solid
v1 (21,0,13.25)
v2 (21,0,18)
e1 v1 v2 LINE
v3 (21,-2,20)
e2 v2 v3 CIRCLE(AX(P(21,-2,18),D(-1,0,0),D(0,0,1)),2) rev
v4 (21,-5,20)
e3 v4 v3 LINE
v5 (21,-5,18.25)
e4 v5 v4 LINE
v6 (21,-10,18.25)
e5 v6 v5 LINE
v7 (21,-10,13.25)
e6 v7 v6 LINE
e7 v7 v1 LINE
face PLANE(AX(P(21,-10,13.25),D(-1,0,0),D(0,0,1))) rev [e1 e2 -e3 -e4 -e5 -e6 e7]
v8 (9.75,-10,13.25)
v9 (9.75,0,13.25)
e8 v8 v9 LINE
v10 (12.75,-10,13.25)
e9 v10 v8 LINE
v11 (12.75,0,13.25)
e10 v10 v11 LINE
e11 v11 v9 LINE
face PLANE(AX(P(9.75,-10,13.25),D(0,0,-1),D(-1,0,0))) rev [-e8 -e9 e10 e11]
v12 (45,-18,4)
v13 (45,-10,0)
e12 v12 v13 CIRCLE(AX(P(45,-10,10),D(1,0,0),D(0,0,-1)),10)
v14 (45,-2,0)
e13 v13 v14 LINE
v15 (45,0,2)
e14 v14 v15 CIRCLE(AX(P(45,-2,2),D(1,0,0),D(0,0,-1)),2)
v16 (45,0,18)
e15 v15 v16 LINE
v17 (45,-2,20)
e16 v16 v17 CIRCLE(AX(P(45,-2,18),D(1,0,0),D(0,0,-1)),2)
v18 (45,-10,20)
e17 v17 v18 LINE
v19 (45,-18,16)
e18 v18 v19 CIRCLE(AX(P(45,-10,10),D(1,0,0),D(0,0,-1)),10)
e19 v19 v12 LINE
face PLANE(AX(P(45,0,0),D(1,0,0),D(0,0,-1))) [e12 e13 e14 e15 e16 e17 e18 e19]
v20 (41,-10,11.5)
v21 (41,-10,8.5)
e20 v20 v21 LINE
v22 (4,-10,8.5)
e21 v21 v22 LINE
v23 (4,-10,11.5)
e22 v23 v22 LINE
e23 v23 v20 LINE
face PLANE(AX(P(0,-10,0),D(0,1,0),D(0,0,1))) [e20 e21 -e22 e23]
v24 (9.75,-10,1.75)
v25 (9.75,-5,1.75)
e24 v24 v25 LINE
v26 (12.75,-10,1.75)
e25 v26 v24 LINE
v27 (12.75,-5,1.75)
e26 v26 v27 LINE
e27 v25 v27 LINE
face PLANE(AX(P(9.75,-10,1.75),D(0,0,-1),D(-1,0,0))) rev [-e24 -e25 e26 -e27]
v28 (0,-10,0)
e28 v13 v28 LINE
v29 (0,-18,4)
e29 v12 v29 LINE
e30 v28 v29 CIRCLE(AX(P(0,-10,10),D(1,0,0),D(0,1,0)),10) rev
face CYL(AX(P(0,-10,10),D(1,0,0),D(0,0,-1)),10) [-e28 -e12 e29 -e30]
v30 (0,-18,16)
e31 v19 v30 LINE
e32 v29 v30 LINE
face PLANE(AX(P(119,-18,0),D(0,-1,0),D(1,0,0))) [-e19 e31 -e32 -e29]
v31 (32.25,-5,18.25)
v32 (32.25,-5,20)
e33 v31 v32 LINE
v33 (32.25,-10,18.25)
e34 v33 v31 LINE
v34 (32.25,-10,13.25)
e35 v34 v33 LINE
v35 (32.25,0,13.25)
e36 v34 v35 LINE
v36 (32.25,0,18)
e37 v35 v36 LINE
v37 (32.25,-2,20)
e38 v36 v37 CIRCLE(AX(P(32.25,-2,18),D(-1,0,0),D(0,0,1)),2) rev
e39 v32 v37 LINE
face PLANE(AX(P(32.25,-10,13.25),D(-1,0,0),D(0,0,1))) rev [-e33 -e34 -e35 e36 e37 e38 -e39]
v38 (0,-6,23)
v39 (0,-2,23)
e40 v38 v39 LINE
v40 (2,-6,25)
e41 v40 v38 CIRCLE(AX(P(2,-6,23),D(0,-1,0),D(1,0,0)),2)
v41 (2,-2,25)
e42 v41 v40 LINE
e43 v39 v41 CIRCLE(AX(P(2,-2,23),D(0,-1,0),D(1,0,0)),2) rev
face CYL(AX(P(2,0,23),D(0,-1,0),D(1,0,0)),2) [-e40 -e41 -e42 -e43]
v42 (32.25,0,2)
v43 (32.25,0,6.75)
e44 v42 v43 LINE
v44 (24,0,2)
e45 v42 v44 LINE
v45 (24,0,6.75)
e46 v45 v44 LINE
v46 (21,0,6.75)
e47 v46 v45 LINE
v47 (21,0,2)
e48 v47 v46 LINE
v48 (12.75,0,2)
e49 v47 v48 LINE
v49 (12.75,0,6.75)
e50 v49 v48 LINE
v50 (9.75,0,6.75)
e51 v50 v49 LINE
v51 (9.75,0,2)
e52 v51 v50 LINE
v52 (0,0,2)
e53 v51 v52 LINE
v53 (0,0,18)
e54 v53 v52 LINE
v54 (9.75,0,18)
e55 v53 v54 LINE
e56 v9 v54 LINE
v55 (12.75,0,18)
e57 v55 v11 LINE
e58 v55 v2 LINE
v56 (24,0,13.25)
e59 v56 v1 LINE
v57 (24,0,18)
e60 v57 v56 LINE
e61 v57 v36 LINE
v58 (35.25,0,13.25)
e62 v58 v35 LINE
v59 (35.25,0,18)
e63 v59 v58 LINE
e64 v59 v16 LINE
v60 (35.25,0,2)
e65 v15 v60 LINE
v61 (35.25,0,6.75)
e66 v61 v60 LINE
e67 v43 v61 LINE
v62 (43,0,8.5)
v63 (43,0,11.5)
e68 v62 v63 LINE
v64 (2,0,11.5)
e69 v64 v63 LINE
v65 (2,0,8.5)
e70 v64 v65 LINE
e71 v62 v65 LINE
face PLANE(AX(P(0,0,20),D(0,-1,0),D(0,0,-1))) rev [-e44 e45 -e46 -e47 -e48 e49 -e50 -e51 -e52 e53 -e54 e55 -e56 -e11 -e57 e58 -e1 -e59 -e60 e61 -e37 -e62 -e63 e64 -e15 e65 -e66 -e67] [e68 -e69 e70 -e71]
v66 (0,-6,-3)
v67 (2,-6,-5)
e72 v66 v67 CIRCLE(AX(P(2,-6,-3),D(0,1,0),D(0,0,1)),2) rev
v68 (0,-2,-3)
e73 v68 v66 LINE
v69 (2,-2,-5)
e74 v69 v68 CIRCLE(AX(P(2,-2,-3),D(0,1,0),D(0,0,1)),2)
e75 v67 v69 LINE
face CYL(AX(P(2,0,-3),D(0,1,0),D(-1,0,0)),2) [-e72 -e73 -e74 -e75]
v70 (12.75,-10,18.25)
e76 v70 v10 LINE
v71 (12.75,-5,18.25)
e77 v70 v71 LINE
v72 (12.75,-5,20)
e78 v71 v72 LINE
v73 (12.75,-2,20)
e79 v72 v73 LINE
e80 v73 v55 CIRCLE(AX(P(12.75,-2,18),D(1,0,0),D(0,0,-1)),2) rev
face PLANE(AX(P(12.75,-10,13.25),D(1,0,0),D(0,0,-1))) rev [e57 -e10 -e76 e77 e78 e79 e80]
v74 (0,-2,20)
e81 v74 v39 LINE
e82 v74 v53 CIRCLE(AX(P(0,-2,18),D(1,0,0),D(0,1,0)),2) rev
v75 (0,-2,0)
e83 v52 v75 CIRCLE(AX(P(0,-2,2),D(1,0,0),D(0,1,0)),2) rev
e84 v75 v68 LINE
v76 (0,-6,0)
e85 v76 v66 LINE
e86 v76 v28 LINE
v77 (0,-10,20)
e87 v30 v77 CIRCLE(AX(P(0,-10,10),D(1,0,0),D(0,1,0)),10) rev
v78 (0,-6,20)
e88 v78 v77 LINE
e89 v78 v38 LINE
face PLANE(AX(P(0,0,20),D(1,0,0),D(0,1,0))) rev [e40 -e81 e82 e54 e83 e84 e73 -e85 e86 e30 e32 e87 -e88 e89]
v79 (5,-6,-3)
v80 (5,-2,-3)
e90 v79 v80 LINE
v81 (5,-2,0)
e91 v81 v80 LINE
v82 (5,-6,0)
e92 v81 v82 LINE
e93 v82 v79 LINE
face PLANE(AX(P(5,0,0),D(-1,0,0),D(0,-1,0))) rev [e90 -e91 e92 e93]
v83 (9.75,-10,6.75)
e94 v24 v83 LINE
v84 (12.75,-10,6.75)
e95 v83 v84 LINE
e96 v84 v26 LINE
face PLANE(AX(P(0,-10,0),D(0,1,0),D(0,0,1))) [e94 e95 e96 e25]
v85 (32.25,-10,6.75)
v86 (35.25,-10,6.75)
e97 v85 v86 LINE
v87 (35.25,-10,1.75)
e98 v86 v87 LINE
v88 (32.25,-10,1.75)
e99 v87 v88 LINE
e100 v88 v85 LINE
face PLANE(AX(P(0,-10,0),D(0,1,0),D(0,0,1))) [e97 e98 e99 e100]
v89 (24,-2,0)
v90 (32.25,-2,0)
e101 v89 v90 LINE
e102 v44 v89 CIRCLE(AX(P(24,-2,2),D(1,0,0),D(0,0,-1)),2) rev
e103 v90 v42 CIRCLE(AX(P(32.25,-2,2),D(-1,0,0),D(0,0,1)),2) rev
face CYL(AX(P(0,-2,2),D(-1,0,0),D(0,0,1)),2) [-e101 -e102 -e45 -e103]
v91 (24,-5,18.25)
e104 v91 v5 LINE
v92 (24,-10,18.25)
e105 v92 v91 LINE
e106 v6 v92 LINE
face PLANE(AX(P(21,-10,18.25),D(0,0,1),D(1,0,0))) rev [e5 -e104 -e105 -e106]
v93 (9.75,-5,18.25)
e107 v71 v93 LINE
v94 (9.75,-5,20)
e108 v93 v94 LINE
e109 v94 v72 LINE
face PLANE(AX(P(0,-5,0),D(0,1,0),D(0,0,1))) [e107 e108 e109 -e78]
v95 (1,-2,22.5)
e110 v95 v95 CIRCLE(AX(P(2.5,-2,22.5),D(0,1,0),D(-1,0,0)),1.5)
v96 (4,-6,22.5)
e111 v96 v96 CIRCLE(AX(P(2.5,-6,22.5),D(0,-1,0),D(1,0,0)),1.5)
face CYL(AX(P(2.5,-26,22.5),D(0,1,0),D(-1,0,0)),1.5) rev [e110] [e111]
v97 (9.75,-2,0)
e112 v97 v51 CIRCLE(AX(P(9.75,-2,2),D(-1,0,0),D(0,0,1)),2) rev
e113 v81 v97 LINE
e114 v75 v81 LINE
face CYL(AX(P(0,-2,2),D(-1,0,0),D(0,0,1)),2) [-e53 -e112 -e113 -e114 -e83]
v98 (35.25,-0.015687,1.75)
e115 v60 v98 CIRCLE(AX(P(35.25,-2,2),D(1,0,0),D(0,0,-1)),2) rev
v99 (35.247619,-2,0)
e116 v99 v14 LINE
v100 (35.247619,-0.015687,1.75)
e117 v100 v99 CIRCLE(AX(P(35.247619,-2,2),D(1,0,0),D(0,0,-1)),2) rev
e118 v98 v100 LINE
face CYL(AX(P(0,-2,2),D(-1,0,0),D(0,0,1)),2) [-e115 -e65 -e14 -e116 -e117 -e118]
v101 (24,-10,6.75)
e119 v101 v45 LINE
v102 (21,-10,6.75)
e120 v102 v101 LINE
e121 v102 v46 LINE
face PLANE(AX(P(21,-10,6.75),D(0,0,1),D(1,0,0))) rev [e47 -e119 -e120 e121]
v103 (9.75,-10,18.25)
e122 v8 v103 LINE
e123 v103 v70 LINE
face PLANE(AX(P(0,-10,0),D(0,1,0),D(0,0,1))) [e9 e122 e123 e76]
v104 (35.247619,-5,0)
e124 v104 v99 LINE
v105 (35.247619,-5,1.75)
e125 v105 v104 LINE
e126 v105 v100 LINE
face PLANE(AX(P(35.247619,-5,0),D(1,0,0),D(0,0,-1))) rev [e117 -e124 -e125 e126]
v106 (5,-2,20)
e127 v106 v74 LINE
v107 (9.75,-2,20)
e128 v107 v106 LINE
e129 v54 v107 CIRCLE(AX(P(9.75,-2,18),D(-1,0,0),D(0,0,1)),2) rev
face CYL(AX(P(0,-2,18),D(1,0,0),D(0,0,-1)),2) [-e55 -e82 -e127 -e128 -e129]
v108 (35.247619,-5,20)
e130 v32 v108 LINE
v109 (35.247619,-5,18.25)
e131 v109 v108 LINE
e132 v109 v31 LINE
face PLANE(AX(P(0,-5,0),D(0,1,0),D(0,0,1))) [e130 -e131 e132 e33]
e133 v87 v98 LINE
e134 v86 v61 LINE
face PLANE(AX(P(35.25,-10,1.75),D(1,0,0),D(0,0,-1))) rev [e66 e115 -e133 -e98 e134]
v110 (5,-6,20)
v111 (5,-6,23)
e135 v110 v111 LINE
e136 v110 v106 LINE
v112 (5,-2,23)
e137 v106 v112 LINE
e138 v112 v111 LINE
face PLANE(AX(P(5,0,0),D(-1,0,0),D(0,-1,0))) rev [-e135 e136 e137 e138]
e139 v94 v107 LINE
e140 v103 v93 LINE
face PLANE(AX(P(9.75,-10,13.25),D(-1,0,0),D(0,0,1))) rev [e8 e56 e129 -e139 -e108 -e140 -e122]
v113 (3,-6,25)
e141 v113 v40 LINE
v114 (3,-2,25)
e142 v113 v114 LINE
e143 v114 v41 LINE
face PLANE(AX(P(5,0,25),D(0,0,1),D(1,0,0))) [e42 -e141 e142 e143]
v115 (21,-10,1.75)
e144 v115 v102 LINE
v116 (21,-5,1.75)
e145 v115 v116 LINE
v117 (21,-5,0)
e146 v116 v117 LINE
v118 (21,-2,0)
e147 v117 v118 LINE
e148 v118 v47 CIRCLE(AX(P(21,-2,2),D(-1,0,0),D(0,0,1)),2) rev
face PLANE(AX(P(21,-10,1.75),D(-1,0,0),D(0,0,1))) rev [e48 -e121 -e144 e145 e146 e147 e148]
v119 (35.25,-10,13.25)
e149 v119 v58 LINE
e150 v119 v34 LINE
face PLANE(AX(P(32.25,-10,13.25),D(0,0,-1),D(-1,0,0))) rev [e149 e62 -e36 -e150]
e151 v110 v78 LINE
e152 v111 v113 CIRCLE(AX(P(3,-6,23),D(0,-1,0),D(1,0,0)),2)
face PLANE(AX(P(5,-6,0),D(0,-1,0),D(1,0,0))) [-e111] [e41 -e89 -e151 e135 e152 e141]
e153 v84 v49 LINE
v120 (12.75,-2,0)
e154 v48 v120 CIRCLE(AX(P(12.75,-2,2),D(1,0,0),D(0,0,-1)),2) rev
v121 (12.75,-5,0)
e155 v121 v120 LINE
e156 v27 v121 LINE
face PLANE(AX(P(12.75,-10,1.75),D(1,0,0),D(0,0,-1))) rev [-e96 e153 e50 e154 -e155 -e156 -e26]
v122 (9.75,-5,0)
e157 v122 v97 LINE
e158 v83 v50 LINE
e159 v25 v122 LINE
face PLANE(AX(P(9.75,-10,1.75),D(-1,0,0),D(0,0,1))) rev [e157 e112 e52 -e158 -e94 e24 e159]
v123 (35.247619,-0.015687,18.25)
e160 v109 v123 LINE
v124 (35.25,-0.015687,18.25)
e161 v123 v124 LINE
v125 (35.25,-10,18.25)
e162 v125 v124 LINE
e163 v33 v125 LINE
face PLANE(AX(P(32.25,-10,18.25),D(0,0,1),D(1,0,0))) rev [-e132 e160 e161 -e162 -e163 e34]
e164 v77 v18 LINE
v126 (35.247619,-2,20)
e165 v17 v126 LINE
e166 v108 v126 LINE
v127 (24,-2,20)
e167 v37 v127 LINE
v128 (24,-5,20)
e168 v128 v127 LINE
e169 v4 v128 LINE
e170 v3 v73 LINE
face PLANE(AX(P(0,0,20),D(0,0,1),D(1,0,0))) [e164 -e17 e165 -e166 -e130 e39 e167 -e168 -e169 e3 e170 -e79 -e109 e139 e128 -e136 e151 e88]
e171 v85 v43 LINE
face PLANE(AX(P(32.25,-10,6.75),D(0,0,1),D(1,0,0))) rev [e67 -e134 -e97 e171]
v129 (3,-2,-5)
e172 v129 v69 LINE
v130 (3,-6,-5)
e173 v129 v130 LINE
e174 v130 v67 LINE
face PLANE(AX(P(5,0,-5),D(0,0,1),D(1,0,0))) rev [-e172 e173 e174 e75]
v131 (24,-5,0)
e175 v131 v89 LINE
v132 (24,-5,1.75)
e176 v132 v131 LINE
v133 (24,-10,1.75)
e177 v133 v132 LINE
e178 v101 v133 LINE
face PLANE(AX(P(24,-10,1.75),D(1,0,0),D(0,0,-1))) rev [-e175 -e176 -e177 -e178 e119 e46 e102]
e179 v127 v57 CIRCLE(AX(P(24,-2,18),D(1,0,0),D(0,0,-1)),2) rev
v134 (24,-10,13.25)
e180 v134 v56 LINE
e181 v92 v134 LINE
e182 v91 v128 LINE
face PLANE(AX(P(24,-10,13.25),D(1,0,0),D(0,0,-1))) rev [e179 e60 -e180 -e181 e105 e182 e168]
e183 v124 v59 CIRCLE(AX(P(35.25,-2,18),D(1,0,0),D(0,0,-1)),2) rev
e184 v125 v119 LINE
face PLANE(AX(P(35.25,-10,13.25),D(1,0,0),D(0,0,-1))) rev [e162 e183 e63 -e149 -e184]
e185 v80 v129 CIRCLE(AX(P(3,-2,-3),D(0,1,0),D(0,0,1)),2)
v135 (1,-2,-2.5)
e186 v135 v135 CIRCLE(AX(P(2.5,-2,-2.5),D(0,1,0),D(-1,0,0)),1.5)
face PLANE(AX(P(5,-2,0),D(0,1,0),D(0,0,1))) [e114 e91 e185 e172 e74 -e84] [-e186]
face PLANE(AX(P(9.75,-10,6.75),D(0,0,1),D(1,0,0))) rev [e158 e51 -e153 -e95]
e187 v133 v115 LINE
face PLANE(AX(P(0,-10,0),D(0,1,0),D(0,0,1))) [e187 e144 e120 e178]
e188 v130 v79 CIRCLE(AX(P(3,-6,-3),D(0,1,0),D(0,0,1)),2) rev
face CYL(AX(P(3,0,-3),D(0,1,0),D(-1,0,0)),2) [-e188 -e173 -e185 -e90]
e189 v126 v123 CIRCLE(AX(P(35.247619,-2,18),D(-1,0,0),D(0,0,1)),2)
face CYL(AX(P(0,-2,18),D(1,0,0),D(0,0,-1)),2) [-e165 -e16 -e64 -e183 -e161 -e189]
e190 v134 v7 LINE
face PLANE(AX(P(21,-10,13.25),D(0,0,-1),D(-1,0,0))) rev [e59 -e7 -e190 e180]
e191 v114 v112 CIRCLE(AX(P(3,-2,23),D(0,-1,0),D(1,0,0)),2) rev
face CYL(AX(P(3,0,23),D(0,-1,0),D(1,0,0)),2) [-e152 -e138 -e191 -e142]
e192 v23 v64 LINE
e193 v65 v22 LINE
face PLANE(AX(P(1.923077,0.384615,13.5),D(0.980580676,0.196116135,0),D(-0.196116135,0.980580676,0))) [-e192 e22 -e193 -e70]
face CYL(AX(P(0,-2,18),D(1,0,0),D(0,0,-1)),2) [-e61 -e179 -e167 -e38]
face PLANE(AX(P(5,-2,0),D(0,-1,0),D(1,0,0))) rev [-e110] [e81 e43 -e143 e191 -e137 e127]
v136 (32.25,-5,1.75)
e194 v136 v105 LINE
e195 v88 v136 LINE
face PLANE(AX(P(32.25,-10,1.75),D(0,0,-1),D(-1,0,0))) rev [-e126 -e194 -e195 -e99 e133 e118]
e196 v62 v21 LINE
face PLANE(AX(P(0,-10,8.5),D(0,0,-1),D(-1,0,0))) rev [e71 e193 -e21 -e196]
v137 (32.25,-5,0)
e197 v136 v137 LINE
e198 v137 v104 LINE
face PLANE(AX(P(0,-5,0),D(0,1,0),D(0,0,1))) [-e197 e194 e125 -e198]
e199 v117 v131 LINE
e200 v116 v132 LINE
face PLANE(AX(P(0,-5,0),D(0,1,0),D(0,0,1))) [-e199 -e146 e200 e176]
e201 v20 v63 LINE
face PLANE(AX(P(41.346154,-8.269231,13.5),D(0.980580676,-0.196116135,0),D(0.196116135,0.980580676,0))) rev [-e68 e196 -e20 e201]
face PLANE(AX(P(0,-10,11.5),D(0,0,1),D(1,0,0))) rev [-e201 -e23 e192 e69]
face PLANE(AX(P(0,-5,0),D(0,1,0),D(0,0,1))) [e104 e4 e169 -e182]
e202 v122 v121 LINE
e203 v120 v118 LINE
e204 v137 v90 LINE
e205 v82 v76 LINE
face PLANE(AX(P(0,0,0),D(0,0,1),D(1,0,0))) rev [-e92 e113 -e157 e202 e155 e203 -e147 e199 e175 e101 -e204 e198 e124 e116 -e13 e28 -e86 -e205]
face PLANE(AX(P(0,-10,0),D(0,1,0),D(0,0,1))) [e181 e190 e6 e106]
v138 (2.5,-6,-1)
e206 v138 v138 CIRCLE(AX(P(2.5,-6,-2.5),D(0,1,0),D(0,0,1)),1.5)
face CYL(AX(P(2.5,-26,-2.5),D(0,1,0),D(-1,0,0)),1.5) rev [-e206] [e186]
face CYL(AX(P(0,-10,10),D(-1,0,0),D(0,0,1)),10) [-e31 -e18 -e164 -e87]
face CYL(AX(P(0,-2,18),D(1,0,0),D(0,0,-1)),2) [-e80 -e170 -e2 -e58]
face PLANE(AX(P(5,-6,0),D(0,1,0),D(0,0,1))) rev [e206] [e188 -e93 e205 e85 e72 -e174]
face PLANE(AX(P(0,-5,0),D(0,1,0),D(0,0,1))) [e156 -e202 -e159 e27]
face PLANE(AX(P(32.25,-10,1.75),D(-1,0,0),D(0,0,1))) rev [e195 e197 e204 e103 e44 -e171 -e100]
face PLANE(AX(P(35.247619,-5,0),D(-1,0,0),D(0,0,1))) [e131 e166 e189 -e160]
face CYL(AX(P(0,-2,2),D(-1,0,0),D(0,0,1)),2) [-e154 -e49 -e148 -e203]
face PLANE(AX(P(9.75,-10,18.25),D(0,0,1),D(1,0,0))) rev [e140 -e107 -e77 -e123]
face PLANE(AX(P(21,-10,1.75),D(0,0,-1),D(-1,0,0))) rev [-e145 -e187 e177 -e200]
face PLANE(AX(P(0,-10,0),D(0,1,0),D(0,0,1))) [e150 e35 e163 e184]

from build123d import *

# Parameters (mm, degrees)
SKETCH1_W            = 90
SKETCH1_H            = 20
BOSS_EXTRUDE1_DEPTH  = 20
SKETCH2_W            = 90
SKETCH2_H            = 3
CUT_EXTRUDE1_DEPTH   = 10
SKETCH3_W            = 3
SKETCH3_H            = 5
CUT_EXTRUDE2_DEPTH   = 10
SKETCH4_W            = 3
SKETCH4_H            = 1.75
SKETCH4_W_2          = 2.997618753
SKETCH4_W_3          = 3.002941468
CUT_EXTRUDE3_DEPTH   = 5
SKETCH5_W            = 1.5
SKETCH5_H            = 3
BOSS_EXTRUDE2_DEPTH  = 10
SKETCH6_W            = 1.5
SKETCH6_H            = 3
BOSS_EXTRUDE3_DEPTH  = 18
BOSS_EXTRUDE4_DEPTH  = 5
FILLET1_START        = 8.5
FILLET1_DEPTH        = 3
FILLET1_START_2      = 8
FILLET1_2_DEPTH      = 4
FILLET2_R            = 10
SKETCH8_W            = 20.140972823
SKETCH8_H            = 2
CUT_EXTRUDE4_DEPTH   = 119
FILLET3_R            = 2
SKETCH9_W            = 5
SKETCH9_H            = 4
BOSS_EXTRUDE6_DEPTH  = 5
SKETCH11_W           = 5
SKETCH11_H           = 4
BOSS_EXTRUDE7_DEPTH  = 5
SKETCH12_R           = 1.5
CUT_EXTRUDE5_DEPTH   = 24
FILLET4_R            = 2
SKETCH14_W           = 71.95999564
SKETCH14_H           = 44.647918029
CUT_EXTRUDE8_DEPTH   = 55
BOSS_EXTRUDE8_START  = 1.5
BOSS_EXTRUDE8_DEPTH  = 1.5
SKETCH16_W           = 5.976122604
SKETCH16_H           = 3
CUT_EXTRUDE9_DEPTH   = 10
SKETCH17_W           = 2
SKETCH17_H           = 3
BOSS_EXTRUDE9_DEPTH  = 10
BOSS_EXTRUDE10_DEPTH = 5


with BuildPart() as part:
    # Sketch1 → Boss-Extrude1 (new body)
    with BuildSketch(Plane.XY):
        with Locations((45, -10)):
            Rectangle(SKETCH1_W, SKETCH1_H)
    extrude(amount=BOSS_EXTRUDE1_DEPTH)

    # Sketch2 → Cut-Extrude1 (cut)
    with BuildSketch(Plane(origin=(0, 0, 0), x_dir=(1, 0, 0), z_dir=(0, 1, 0))):
        with Locations((45, -10)):
            Rectangle(SKETCH2_W, SKETCH2_H)
    extrude(amount=-CUT_EXTRUDE1_DEPTH, mode=Mode.SUBTRACT)

    # Sketch3 → Cut-Extrude2 (cut)
    with BuildSketch(Plane(origin=(0, 0, 0), x_dir=(1, 0, 0), z_dir=(0, 1, 0))):
        with Locations((11.25, -15.75)):
            Rectangle(SKETCH3_W, SKETCH3_H)
        with Locations((22.5, -15.75)):
            Rectangle(SKETCH3_W, SKETCH3_H)
        with Locations((33.75, -15.75)):
            Rectangle(SKETCH3_W, SKETCH3_H)
        with Locations((45, -15.75)):
            Rectangle(SKETCH3_W, SKETCH3_H)
        with Locations((56.25, -15.75)):
            Rectangle(SKETCH3_W, SKETCH3_H)
        with Locations((67.5, -15.75)):
            Rectangle(SKETCH3_W, SKETCH3_H)
        with Locations((78.75, -15.75)):
            Rectangle(SKETCH3_W, SKETCH3_H)
        with Locations((11.25, -4.25)):
            Rectangle(SKETCH3_W, SKETCH3_H)
        with Locations((22.5, -4.25)):
            Rectangle(SKETCH3_W, SKETCH3_H)
        with Locations((33.75, -4.25)):
            Rectangle(SKETCH3_W, SKETCH3_H)
        with Locations((45, -4.25)):
            Rectangle(SKETCH3_W, SKETCH3_H)
        with Locations((56.25, -4.25)):
            Rectangle(SKETCH3_W, SKETCH3_H)
        with Locations((67.5, -4.25)):
            Rectangle(SKETCH3_W, SKETCH3_H)
        with Locations((78.75, -4.25)):
            Rectangle(SKETCH3_W, SKETCH3_H)
    extrude(amount=-CUT_EXTRUDE2_DEPTH, mode=Mode.SUBTRACT)

    # Sketch4 → Cut-Extrude3 (cut)
    with BuildSketch(Plane(origin=(0, 0, 0), x_dir=(1, 0, 0), z_dir=(0, 1, 0))):
        with Locations((56.25, -19.125)):
            Rectangle(SKETCH4_W, SKETCH4_H)
        with Locations((67.5, -19.125)):
            Rectangle(SKETCH4_W, SKETCH4_H)
        Polygon((77.25, -18.25), (77.25, -20), (80.252941468, -20), (80.252941468, -18.25), (80.25, -18.25), align=None)
        with Locations((45, -19.125)):
            Rectangle(SKETCH4_W, SKETCH4_H)
        with Locations((33.748809377, -19.125)):
            Rectangle(SKETCH4_W_2, SKETCH4_H)
        with Locations((22.5, -19.125)):
            Rectangle(SKETCH4_W, SKETCH4_H)
        with Locations((11.25, -19.125)):
            Rectangle(SKETCH4_W, SKETCH4_H)
        with Locations((22.5, -0.875)):
            Rectangle(SKETCH4_W, SKETCH4_H)
        with Locations((33.748809377, -0.875)):
            Rectangle(SKETCH4_W_2, SKETCH4_H)
        with Locations((45, -0.875)):
            Rectangle(SKETCH4_W, SKETCH4_H)
        with Locations((56.25, -0.875)):
            Rectangle(SKETCH4_W, SKETCH4_H)
        with Locations((67.5, -0.875)):
            Rectangle(SKETCH4_W, SKETCH4_H)
        with Locations((78.751470734, -0.875)):
            Rectangle(SKETCH4_W_3, SKETCH4_H)
        with Locations((11.25, -0.875)):
            Rectangle(SKETCH4_W, SKETCH4_H)
    extrude(amount=-CUT_EXTRUDE3_DEPTH, mode=Mode.SUBTRACT)

    # Sketch5 → Boss-Extrude2 (add)
    with BuildSketch(Plane(origin=(0, -10, 0), x_dir=(1, 0, 0), z_dir=(0, 1, 0))):
        with Locations((0.75, -10)):
            Rectangle(SKETCH5_W, SKETCH5_H)
        with Locations((89.25, -10)):
            Rectangle(SKETCH5_W, SKETCH5_H)
    extrude(amount=BOSS_EXTRUDE2_DEPTH)

    # Sketch6 → Boss-Extrude3 (add)
    with BuildSketch(Plane(origin=(0, 0, 0), x_dir=(1, 0, 0), z_dir=(0, 1, 0))):
        with Locations((2.25, -10)):
            Rectangle(SKETCH6_W, SKETCH6_H)
        with Locations((87.75, -10)):
            Rectangle(SKETCH6_W, SKETCH6_H)
    extrude(amount=-BOSS_EXTRUDE3_DEPTH)

    # Sketch7 → Boss-Extrude4 (add)
    with BuildSketch(Plane.XY.offset(8.5)):
        Polygon((3, -9.907661673), (3, -10), (6, -10), (3, 0), align=None)
        Polygon((87, 0), (84, -10), (87, -10), align=None)
    extrude(amount=BOSS_EXTRUDE4_DEPTH)

    # Fillet1: read off the stored shape, not the designer's step
    # Fillet1 outline → Fillet1 (cut)
    with BuildSketch(Plane.XY.offset(FILLET1_START)):
        with BuildLine():
            ThreePointArc((1.511938698, 0), (2.705799758, -0.395414143), (3.427591269, -1.425304229))
            Line((3.427591269, -1.425304229), (3, 0))
            Line((3, 0), (1.511938698, 0))
        make_face()
        with BuildLine():
            Line((87, 0), (86.572408731, -1.425304229))
            ThreePointArc((86.572408731, -1.425304229), (87.294200242, -0.395414143), (88.488061302, 0))
            Line((88.488061302, 0), (87, 0))
        make_face()
    extrude(amount=FILLET1_DEPTH, mode=Mode.SUBTRACT)

    # Fillet1 2 outline → Fillet1 2 (add)
    with BuildSketch(Plane.XY.offset(FILLET1_START_2)):
        with BuildLine():
            Line((6, -10), (7.488061302, -10))
            ThreePointArc((7.488061302, -10), (6.294200242, -9.604585857), (5.572408731, -8.574695771))
            Line((5.572408731, -8.574695771), (6, -10))
        make_face()
        with BuildLine():
            ThreePointArc((84.427591269, -8.574695771), (83.705799758, -9.604585857), (82.511938698, -10))
            Line((82.511938698, -10), (84, -10))
            Line((84, -10), (84.427591269, -8.574695771))
        make_face()
    extrude(amount=FILLET1_2_DEPTH)

    # Fillet2
    fillet2_edges = [part.edges().sort_by_distance(p)[0] for p in [
        (45, -20, 0),
        (45, -20, 20),
    ]]
    fillet(fillet2_edges, radius=FILLET2_R - 0.0001)  # a hair under: the kernel refuses the full size

    # Sketch8 → Cut-Extrude4 (cut)
    with BuildSketch(Plane.ZY):
        with Locations((10.770725067, -19)):
            Rectangle(SKETCH8_W, SKETCH8_H)
    extrude(amount=-CUT_EXTRUDE4_DEPTH, mode=Mode.SUBTRACT)

    # Fillet3
    fillet3_edges = [part.edges().sort_by_distance(p)[0] for p in [
        (4.875, 0, 0),
        (4.875, 0, 20),
        (16.875, 0, 20),
        (16.875, 0, 0),
        (28.125, 0, 0),
        (28.125, 0, 20),
        (39.373809377, 0, 20),
        (39.373809377, 0, 0),
        (50.625, 0, 0),
        (50.625, 0, 20),
        (61.875, 0, 20),
        (61.875, 0, 0),
        (73.125, 0, 0),
        (73.125, 0, 20),
        (85.126470734, 0, 20),
        (85.126470734, 0, 0),
    ]]
    fillet(fillet3_edges, radius=FILLET3_R)

    # Sketch9 → Boss-Extrude6 (add)
    with BuildSketch(Plane.ZY):
        with Locations((-2.5, -4)):
            Rectangle(SKETCH9_W, SKETCH9_H)
        with Locations((22.5, -4)):
            Rectangle(SKETCH9_W, SKETCH9_H)
    extrude(amount=-BOSS_EXTRUDE6_DEPTH)

    # Sketch11 → Boss-Extrude7 (add)
    with BuildSketch(Plane(origin=(90, 0, 0), x_dir=(0, 0, -1), z_dir=(1, 0, 0))):
        with Locations((2.5, -4)):
            Rectangle(SKETCH11_W, SKETCH11_H)
        with Locations((-22.5, -4)):
            Rectangle(SKETCH11_W, SKETCH11_H)
    extrude(amount=-BOSS_EXTRUDE7_DEPTH)

    # Sketch12 → Cut-Extrude5 (cut)
    with BuildSketch(Plane(origin=(0, -2, 0), x_dir=(1, 0, 0), z_dir=(0, 1, 0))):
        with Locations(Location((2.5, 2.5, 0), (0, 0, 180))):
            Circle(SKETCH12_R)
        with Locations(Location((87.5, 2.5, 0), (0, 0, 180))):
            Circle(SKETCH12_R)
        with Locations(Location((87.5, -22.5, 0), (0, 0, 180))):
            Circle(SKETCH12_R)
        with Locations(Location((2.5, -22.5, 0), (0, 0, 180))):
            Circle(SKETCH12_R)
    extrude(amount=-CUT_EXTRUDE5_DEPTH, mode=Mode.SUBTRACT)

    # Fillet4
    fillet4_edges = [part.edges().sort_by_distance(p)[0] for p in [
        (0, -4, -5),
        (5, -4, -5),
        (5, -4, 25),
        (0, -4, 25),
        (85, -4, -5),
        (90, -4, -5),
        (85, -4, 25),
        (90, -4, 25),
    ]]
    fillet(fillet4_edges, radius=FILLET4_R)

    # Sketch14 → Cut-Extrude8 (cut)
    with BuildSketch(Plane(origin=(0, 0, 0), x_dir=(1, 0, 0), z_dir=(0, 1, 0))):
        with Locations((79.47999782, -11.65925291)):
            Rectangle(SKETCH14_W, SKETCH14_H)
    extrude(amount=-CUT_EXTRUDE8_DEPTH, mode=Mode.SUBTRACT)

    # Sketch15 → Boss-Extrude8 (add)
    with BuildSketch(Plane(origin=(43.5, 0, 0), x_dir=(0, 0, -1), z_dir=(1, 0, 0)).offset(BOSS_EXTRUDE8_START)):
        with BuildLine():
            Line((-11.5, 0), (-18, 0))
            ThreePointArc((-18, 0), (-19.414213562, -0.585786438), (-20, -2))
            Line((-20, -2), (-20, -10))
            ThreePointArc((-20, -10), (-18.94427191, -14.472135955), (-16, -18))
            Line((-16, -18), (-4, -18))
            ThreePointArc((-4, -18), (-1.05572809, -14.472135955), (0, -10))
            Line((0, -10), (0, -2))
            ThreePointArc((0, -2), (-0.585786438, -0.585786438), (-2, 0))
            Line((-2, 0), (-4, 0))
            Line((-4, 0), (-8.5, 0))
            Line((-8.5, 0), (-8.5, -10))
            Line((-8.5, -10), (-11.5, -10))
            Line((-11.5, -10), (-11.5, 0))
        make_face()
    extrude(amount=-BOSS_EXTRUDE8_DEPTH)

    # Sketch16 → Cut-Extrude9 (cut)
    with BuildSketch(Plane(origin=(0, 0, 0), x_dir=(1, 0, 0), z_dir=(0, 1, 0))):
        with Locations((4.5, -10)):
            Rectangle(SKETCH16_W, SKETCH16_H)
    extrude(amount=-CUT_EXTRUDE9_DEPTH, mode=Mode.SUBTRACT)

    # Sketch17 → Boss-Extrude9 (add)
    with BuildSketch(Plane(origin=(0, 0, 0), x_dir=(1, 0, 0), z_dir=(0, 1, 0))):
        Polygon((2, -8.5), (1.511938698, -8.5), (0, -8.5), (0, -11.5), (1.511938698, -11.5), (2, -11.5), align=None)
        with Locations((44, -10)):
            Rectangle(SKETCH17_W, SKETCH17_H)
    extrude(amount=-BOSS_EXTRUDE9_DEPTH)

    # Sketch18 → Boss-Extrude10 (add)
    with BuildSketch(Plane.XY.offset(8.5)):
        Polygon((4, -10), (2, 0), (2, -10), align=None)
        Polygon((43, 0), (41, -10), (43, -10), align=None)
    extrude(amount=BOSS_EXTRUDE10_DEPTH)


solid = part.part
